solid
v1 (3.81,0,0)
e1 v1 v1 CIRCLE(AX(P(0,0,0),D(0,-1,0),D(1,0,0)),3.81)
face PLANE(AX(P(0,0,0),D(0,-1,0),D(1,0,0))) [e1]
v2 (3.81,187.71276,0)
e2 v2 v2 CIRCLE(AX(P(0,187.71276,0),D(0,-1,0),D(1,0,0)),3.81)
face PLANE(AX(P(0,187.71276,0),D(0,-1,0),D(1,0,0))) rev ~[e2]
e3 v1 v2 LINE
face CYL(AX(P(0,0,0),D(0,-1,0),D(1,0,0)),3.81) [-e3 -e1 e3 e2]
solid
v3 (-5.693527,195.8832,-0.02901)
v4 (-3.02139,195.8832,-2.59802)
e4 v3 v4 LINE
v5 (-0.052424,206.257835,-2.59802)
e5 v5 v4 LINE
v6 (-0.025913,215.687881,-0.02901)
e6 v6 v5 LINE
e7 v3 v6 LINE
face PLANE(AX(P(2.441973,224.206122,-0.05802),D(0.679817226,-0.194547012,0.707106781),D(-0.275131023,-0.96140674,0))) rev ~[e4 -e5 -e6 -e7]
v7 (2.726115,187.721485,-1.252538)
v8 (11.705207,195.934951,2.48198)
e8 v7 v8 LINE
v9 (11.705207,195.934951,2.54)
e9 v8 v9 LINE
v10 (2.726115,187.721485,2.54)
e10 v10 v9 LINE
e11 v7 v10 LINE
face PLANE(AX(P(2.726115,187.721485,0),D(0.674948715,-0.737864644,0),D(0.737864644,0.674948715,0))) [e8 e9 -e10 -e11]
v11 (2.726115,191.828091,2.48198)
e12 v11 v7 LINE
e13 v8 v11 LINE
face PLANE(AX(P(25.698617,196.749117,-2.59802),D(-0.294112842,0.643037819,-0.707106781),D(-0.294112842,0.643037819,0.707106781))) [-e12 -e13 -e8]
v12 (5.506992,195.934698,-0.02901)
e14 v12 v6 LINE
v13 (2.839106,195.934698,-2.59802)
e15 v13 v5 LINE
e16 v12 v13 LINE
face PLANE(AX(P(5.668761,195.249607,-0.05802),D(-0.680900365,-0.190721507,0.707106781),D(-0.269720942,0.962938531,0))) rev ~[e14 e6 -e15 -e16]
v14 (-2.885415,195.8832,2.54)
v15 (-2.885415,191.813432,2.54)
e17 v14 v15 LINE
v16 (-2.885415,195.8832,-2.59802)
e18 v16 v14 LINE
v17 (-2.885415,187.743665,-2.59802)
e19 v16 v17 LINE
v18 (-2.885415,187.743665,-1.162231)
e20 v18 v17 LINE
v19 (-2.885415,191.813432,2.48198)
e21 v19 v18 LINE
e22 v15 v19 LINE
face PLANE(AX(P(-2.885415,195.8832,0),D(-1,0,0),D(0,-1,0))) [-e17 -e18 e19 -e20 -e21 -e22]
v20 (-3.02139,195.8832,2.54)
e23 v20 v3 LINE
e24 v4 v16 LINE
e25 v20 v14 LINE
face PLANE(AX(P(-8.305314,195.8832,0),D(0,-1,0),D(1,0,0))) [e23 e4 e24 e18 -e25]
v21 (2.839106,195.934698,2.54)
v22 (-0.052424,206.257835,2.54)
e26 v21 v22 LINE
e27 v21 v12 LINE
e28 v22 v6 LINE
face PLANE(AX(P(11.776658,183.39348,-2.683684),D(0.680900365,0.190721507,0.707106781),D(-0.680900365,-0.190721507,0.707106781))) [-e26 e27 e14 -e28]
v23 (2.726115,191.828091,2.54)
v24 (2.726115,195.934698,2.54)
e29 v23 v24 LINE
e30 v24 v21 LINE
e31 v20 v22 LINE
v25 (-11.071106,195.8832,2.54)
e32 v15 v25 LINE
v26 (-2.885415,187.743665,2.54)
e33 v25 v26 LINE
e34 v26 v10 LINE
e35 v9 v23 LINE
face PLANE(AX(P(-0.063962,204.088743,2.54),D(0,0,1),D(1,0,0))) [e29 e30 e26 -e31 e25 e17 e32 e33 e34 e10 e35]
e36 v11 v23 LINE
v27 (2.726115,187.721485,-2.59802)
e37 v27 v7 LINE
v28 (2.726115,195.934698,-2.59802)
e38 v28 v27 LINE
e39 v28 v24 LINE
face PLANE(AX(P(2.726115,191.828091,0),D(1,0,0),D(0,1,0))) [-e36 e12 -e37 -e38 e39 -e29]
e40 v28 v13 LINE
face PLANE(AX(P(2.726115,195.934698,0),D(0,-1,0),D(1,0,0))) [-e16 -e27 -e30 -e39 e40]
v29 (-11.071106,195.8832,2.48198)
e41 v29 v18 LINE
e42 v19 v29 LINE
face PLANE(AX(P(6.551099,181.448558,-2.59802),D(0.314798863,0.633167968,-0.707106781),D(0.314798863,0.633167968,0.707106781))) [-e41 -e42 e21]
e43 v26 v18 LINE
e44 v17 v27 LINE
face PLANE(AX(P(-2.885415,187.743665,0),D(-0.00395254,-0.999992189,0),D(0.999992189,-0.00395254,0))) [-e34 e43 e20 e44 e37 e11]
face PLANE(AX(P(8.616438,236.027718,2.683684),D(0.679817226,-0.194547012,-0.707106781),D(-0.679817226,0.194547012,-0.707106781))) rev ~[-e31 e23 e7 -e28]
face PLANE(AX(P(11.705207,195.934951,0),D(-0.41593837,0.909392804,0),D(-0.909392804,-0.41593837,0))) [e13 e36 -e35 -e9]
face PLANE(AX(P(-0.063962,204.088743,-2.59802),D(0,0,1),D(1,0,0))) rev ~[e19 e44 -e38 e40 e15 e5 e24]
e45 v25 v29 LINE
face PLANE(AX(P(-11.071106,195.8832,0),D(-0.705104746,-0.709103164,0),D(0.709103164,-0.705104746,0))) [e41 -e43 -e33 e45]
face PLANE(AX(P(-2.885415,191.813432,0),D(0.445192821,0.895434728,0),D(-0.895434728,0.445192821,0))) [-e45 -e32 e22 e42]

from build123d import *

# Parameters (mm, degrees)
F0_R          = 3.81
F1_DEPTH      = 187.71276
F3_DEPTH      = 2.54
F3_DEPTH_BACK = 2.59802
F4_SIZE       = 5.08
F5_T4_DEPTH   = 56.2135595652
F5_T10_DEPTH  = 56.3150595014
F5_T17_DEPTH  = 56.2135595652
F5_T21_DEPTH  = 56.3150595014
F6_T4_DEPTH   = 35.2698827679
F6_T9_DEPTH   = 36.002021323


# Not quite as in the source:
# - a fillet or chamfer that OpenCascade refuses, or shapes differently, is made with other operations: its cross-section is extruded or revolved along the edge and cut away or added


with BuildPart() as f1:
    # F0 (on Front) → F1 (new body)
    with BuildSketch(Plane.XZ):
        Circle(F0_R)
    extrude(amount=-F1_DEPTH)


with BuildPart() as f3:
    # F2 (on Top) → F3 (new body, two sides)
    with BuildSketch(Plane.XY) as f3_sk:
        Polygon((-2.8854149859, 191.8134321757), (-2.8854149859, 187.7436647788), (2.7261148207, 187.7214848121), (2.7261148207, 191.8280913989), (2.7261148207, 195.9346979856), (8.1146247685, 195.9346979856), (0, 224.9049544334), (-8.3053142529, 195.8831995726), (-2.8854149859, 195.8831995726), align=None)
        Polygon((-11.071106419, 195.8831995726), (-2.8854149859, 187.7436647788), (-2.8854149859, 191.8134321757), align=None)
        Polygon((2.7261148207, 191.8280913989), (2.7261148207, 187.7214848121), (11.7052067071, 195.9349513054), align=None)
    extrude(amount=F3_DEPTH)
    extrude(f3_sk.sketch, amount=-F3_DEPTH_BACK)

    # F4
    f4_edges = [f3.edges().sort_by_distance(p)[0] for p in [
        (4.057312, 210.419826, -2.59802),
        (-4.152657, 210.394077, -2.59802),
    ]]
    chamfer(f4_edges, length=F4_SIZE)

    # F5: chamfer of 5.08 on 2 edges, made by hand


with BuildPart() as f5_tool2:
    # F5_s3 → F5_t4 (new body)
    with BuildSketch(Plane(origin=(-46.7750694582, 166.9930275555, 0), x_dir=(0, 0, 1), z_dir=(-0.2697209417, 0.9629385305, 0))):
        with BuildLine():
            Line((-2.6836840979, 60.8052602015), (2.6836840979, 55.4378920056))
            Line((2.6836840979, 55.4378920056), (2.7852840979, 55.4378920056))
            ThreePointArc((2.7852840979, 55.4378920056), (2.6416, 58.0497340546), (2.6416, 60.6615761036))
            Line((2.6416, 60.6615761036), (2.54, 60.7631761036))
            ThreePointArc((2.54, 60.7631761036), (-0.071842049, 60.7631761036), (-2.6836840979, 60.9068602015))
            Line((-2.6836840979, 60.9068602015), (-2.6836840979, 60.8052602015))
        make_face()
    extrude(amount=F5_T4_DEPTH)

    split(bisect_by=Plane.XZ.offset(-195.9346979856), keep=Keep.BOTTOM)

    split(bisect_by=Plane(origin=(-59.4902437107, 17.0246482808, 0), x_dir=(0, 0, 1), z_dir=(0.9614067403, -0.275131023, 0)), keep=Keep.TOP)


with BuildPart() as f3_1:
    add(f3.part)

    # F5_t1: cut F5_tool2
    add(f5_tool2.part, mode=Mode.SUBTRACT)


with BuildPart() as f5_tool8:
    # F5_s9 → F5_t10 (new body)
    with BuildSketch(Plane(origin=(63.0845965483, 220.4402676135, 0), x_dir=(0, 0, 1), z_dir=(-0.275131023, -0.9614067403, 0))):
        with BuildLine():
            Line((2.6836840979, 56.6546460819), (-2.6836840979, 62.0220142778))
            Line((-2.6836840979, 62.0220142778), (-2.6836840979, 62.1236142778))
            ThreePointArc((-2.6836840979, 62.1236142778), (-0.071842049, 61.9799301798), (2.54, 61.9799301798))
            Line((2.54, 61.9799301798), (2.6416, 61.8783301798))
            ThreePointArc((2.6416, 61.8783301798), (2.6416, 59.2664881309), (2.7852840979, 56.6546460819))
            Line((2.7852840979, 56.6546460819), (2.6836840979, 56.6546460819))
        make_face()
    extrude(amount=F5_T10_DEPTH)

    split(bisect_by=Plane.XZ.offset(-195.8831995726), keep=Keep.BOTTOM)

    split(bisect_by=Plane(origin=(58.4133689537, 16.3616974319, 0), x_dir=(0, 0, 1), z_dir=(-0.9629385305, -0.2697209417, 0)), keep=Keep.TOP)


with BuildPart() as f3_2:
    add(f3_1.part)

    # F5_t7: cut F5_tool8
    add(f5_tool8.part, mode=Mode.SUBTRACT)


with BuildPart() as f5_tool15:
    # F5_s16 → F5_t17 (new body)
    with BuildSketch(Plane(origin=(-46.7750694582, 166.9930275555, 0), x_dir=(0, 0, 1), z_dir=(-0.2697209417, 0.9629385305, 0))):
        with BuildLine():
            Line((-2.6836840979, 60.8052602015), (2.6836840979, 55.4378920056))
            Line((2.6836840979, 55.4378920056), (2.7852840979, 55.4378920056))
            ThreePointArc((2.7852840979, 55.4378920056), (2.6416, 58.0497340546), (2.6416, 60.6615761036))
            Line((2.6416, 60.6615761036), (2.54, 60.7631761036))
            ThreePointArc((2.54, 60.7631761036), (-0.071842049, 60.7631761036), (-2.6836840979, 60.9068602015))
            Line((-2.6836840979, 60.9068602015), (-2.6836840979, 60.8052602015))
        make_face()
    extrude(amount=F5_T17_DEPTH)

    split(bisect_by=Plane(origin=(-59.4902437107, 17.0246482808, 0), x_dir=(0, 0, 1), z_dir=(-0.9614067403, 0.275131023, 0)), keep=Keep.TOP)


with BuildPart() as f5_tool19:
    # F5_s20 → F5_t21 (new body)
    with BuildSketch(Plane(origin=(63.0845965483, 220.4402676135, 0), x_dir=(0, 0, 1), z_dir=(-0.275131023, -0.9614067403, 0))):
        with BuildLine():
            Line((2.6836840979, 56.6546460819), (-2.6836840979, 62.0220142778))
            Line((-2.6836840979, 62.0220142778), (-2.6836840979, 62.1236142778))
            ThreePointArc((-2.6836840979, 62.1236142778), (-0.071842049, 61.9799301798), (2.54, 61.9799301798))
            Line((2.54, 61.9799301798), (2.6416, 61.8783301798))
            ThreePointArc((2.6416, 61.8783301798), (2.6416, 59.2664881309), (2.7852840979, 56.6546460819))
            Line((2.7852840979, 56.6546460819), (2.6836840979, 56.6546460819))
        make_face()
    extrude(amount=F5_T21_DEPTH)

    split(bisect_by=Plane(origin=(58.4133689537, 16.3616974319, 0), x_dir=(0, 0, 1), z_dir=(0.9629385305, 0.2697209417, 0)), keep=Keep.TOP)


with BuildPart() as f5_tool15_1:
    add(f5_tool15.part)

    # F5_t23: intersect F5_tool19
    add(f5_tool19.part, mode=Mode.INTERSECT)


with BuildPart() as f3_3:
    add(f3_2.part)

    # F5_t13: cut F5_tool15
    add(f5_tool15_1.part, mode=Mode.SUBTRACT)

    # F6: chamfer of 5.08 on 2 edges, made by hand


with BuildPart() as f6_tool2:
    # F6_s3 → F6_t4 (new body)
    with BuildSketch(Plane(origin=(-67.0801622098, 33.3509587273, 0), x_dir=(0, 0, 1), z_dir=(-0.895434728, 0.4451928211, 0))):
        Polygon((-2.59802, 165.3918424207), (2.48198, 170.4718424207), (-2.59802, 170.4718424207), align=None)
    extrude(amount=F6_T4_DEPTH)

    split(bisect_by=Plane.YZ.offset(-2.8854149859), keep=Keep.BOTTOM)


with BuildPart() as f3_4:
    add(f3_3.part)

    # F6_t1: cut F6_tool2
    add(f6_tool2.part, mode=Mode.SUBTRACT)


with BuildPart() as f6_tool7:
    # F6_s8 → F6_t9 (new body)
    with BuildSketch(Plane(origin=(95.6732562057, 43.7590643917, 0), x_dir=(0, 0, 1), z_dir=(-0.9093928041, -0.4159383703, 0))):
        Polygon((-2.59802, 168.2331901799), (2.48198, 173.3131901799), (-2.59802, 173.3131901799), align=None)
    extrude(amount=F6_T9_DEPTH)

    split(bisect_by=Plane.YZ.offset(2.7261148207), keep=Keep.TOP)


with BuildPart() as f3_5:
    add(f3_4.part)

    # F6_t6: cut F6_tool7
    add(f6_tool7.part, mode=Mode.SUBTRACT)


solid = Compound([f1.part, f3_5.part])
